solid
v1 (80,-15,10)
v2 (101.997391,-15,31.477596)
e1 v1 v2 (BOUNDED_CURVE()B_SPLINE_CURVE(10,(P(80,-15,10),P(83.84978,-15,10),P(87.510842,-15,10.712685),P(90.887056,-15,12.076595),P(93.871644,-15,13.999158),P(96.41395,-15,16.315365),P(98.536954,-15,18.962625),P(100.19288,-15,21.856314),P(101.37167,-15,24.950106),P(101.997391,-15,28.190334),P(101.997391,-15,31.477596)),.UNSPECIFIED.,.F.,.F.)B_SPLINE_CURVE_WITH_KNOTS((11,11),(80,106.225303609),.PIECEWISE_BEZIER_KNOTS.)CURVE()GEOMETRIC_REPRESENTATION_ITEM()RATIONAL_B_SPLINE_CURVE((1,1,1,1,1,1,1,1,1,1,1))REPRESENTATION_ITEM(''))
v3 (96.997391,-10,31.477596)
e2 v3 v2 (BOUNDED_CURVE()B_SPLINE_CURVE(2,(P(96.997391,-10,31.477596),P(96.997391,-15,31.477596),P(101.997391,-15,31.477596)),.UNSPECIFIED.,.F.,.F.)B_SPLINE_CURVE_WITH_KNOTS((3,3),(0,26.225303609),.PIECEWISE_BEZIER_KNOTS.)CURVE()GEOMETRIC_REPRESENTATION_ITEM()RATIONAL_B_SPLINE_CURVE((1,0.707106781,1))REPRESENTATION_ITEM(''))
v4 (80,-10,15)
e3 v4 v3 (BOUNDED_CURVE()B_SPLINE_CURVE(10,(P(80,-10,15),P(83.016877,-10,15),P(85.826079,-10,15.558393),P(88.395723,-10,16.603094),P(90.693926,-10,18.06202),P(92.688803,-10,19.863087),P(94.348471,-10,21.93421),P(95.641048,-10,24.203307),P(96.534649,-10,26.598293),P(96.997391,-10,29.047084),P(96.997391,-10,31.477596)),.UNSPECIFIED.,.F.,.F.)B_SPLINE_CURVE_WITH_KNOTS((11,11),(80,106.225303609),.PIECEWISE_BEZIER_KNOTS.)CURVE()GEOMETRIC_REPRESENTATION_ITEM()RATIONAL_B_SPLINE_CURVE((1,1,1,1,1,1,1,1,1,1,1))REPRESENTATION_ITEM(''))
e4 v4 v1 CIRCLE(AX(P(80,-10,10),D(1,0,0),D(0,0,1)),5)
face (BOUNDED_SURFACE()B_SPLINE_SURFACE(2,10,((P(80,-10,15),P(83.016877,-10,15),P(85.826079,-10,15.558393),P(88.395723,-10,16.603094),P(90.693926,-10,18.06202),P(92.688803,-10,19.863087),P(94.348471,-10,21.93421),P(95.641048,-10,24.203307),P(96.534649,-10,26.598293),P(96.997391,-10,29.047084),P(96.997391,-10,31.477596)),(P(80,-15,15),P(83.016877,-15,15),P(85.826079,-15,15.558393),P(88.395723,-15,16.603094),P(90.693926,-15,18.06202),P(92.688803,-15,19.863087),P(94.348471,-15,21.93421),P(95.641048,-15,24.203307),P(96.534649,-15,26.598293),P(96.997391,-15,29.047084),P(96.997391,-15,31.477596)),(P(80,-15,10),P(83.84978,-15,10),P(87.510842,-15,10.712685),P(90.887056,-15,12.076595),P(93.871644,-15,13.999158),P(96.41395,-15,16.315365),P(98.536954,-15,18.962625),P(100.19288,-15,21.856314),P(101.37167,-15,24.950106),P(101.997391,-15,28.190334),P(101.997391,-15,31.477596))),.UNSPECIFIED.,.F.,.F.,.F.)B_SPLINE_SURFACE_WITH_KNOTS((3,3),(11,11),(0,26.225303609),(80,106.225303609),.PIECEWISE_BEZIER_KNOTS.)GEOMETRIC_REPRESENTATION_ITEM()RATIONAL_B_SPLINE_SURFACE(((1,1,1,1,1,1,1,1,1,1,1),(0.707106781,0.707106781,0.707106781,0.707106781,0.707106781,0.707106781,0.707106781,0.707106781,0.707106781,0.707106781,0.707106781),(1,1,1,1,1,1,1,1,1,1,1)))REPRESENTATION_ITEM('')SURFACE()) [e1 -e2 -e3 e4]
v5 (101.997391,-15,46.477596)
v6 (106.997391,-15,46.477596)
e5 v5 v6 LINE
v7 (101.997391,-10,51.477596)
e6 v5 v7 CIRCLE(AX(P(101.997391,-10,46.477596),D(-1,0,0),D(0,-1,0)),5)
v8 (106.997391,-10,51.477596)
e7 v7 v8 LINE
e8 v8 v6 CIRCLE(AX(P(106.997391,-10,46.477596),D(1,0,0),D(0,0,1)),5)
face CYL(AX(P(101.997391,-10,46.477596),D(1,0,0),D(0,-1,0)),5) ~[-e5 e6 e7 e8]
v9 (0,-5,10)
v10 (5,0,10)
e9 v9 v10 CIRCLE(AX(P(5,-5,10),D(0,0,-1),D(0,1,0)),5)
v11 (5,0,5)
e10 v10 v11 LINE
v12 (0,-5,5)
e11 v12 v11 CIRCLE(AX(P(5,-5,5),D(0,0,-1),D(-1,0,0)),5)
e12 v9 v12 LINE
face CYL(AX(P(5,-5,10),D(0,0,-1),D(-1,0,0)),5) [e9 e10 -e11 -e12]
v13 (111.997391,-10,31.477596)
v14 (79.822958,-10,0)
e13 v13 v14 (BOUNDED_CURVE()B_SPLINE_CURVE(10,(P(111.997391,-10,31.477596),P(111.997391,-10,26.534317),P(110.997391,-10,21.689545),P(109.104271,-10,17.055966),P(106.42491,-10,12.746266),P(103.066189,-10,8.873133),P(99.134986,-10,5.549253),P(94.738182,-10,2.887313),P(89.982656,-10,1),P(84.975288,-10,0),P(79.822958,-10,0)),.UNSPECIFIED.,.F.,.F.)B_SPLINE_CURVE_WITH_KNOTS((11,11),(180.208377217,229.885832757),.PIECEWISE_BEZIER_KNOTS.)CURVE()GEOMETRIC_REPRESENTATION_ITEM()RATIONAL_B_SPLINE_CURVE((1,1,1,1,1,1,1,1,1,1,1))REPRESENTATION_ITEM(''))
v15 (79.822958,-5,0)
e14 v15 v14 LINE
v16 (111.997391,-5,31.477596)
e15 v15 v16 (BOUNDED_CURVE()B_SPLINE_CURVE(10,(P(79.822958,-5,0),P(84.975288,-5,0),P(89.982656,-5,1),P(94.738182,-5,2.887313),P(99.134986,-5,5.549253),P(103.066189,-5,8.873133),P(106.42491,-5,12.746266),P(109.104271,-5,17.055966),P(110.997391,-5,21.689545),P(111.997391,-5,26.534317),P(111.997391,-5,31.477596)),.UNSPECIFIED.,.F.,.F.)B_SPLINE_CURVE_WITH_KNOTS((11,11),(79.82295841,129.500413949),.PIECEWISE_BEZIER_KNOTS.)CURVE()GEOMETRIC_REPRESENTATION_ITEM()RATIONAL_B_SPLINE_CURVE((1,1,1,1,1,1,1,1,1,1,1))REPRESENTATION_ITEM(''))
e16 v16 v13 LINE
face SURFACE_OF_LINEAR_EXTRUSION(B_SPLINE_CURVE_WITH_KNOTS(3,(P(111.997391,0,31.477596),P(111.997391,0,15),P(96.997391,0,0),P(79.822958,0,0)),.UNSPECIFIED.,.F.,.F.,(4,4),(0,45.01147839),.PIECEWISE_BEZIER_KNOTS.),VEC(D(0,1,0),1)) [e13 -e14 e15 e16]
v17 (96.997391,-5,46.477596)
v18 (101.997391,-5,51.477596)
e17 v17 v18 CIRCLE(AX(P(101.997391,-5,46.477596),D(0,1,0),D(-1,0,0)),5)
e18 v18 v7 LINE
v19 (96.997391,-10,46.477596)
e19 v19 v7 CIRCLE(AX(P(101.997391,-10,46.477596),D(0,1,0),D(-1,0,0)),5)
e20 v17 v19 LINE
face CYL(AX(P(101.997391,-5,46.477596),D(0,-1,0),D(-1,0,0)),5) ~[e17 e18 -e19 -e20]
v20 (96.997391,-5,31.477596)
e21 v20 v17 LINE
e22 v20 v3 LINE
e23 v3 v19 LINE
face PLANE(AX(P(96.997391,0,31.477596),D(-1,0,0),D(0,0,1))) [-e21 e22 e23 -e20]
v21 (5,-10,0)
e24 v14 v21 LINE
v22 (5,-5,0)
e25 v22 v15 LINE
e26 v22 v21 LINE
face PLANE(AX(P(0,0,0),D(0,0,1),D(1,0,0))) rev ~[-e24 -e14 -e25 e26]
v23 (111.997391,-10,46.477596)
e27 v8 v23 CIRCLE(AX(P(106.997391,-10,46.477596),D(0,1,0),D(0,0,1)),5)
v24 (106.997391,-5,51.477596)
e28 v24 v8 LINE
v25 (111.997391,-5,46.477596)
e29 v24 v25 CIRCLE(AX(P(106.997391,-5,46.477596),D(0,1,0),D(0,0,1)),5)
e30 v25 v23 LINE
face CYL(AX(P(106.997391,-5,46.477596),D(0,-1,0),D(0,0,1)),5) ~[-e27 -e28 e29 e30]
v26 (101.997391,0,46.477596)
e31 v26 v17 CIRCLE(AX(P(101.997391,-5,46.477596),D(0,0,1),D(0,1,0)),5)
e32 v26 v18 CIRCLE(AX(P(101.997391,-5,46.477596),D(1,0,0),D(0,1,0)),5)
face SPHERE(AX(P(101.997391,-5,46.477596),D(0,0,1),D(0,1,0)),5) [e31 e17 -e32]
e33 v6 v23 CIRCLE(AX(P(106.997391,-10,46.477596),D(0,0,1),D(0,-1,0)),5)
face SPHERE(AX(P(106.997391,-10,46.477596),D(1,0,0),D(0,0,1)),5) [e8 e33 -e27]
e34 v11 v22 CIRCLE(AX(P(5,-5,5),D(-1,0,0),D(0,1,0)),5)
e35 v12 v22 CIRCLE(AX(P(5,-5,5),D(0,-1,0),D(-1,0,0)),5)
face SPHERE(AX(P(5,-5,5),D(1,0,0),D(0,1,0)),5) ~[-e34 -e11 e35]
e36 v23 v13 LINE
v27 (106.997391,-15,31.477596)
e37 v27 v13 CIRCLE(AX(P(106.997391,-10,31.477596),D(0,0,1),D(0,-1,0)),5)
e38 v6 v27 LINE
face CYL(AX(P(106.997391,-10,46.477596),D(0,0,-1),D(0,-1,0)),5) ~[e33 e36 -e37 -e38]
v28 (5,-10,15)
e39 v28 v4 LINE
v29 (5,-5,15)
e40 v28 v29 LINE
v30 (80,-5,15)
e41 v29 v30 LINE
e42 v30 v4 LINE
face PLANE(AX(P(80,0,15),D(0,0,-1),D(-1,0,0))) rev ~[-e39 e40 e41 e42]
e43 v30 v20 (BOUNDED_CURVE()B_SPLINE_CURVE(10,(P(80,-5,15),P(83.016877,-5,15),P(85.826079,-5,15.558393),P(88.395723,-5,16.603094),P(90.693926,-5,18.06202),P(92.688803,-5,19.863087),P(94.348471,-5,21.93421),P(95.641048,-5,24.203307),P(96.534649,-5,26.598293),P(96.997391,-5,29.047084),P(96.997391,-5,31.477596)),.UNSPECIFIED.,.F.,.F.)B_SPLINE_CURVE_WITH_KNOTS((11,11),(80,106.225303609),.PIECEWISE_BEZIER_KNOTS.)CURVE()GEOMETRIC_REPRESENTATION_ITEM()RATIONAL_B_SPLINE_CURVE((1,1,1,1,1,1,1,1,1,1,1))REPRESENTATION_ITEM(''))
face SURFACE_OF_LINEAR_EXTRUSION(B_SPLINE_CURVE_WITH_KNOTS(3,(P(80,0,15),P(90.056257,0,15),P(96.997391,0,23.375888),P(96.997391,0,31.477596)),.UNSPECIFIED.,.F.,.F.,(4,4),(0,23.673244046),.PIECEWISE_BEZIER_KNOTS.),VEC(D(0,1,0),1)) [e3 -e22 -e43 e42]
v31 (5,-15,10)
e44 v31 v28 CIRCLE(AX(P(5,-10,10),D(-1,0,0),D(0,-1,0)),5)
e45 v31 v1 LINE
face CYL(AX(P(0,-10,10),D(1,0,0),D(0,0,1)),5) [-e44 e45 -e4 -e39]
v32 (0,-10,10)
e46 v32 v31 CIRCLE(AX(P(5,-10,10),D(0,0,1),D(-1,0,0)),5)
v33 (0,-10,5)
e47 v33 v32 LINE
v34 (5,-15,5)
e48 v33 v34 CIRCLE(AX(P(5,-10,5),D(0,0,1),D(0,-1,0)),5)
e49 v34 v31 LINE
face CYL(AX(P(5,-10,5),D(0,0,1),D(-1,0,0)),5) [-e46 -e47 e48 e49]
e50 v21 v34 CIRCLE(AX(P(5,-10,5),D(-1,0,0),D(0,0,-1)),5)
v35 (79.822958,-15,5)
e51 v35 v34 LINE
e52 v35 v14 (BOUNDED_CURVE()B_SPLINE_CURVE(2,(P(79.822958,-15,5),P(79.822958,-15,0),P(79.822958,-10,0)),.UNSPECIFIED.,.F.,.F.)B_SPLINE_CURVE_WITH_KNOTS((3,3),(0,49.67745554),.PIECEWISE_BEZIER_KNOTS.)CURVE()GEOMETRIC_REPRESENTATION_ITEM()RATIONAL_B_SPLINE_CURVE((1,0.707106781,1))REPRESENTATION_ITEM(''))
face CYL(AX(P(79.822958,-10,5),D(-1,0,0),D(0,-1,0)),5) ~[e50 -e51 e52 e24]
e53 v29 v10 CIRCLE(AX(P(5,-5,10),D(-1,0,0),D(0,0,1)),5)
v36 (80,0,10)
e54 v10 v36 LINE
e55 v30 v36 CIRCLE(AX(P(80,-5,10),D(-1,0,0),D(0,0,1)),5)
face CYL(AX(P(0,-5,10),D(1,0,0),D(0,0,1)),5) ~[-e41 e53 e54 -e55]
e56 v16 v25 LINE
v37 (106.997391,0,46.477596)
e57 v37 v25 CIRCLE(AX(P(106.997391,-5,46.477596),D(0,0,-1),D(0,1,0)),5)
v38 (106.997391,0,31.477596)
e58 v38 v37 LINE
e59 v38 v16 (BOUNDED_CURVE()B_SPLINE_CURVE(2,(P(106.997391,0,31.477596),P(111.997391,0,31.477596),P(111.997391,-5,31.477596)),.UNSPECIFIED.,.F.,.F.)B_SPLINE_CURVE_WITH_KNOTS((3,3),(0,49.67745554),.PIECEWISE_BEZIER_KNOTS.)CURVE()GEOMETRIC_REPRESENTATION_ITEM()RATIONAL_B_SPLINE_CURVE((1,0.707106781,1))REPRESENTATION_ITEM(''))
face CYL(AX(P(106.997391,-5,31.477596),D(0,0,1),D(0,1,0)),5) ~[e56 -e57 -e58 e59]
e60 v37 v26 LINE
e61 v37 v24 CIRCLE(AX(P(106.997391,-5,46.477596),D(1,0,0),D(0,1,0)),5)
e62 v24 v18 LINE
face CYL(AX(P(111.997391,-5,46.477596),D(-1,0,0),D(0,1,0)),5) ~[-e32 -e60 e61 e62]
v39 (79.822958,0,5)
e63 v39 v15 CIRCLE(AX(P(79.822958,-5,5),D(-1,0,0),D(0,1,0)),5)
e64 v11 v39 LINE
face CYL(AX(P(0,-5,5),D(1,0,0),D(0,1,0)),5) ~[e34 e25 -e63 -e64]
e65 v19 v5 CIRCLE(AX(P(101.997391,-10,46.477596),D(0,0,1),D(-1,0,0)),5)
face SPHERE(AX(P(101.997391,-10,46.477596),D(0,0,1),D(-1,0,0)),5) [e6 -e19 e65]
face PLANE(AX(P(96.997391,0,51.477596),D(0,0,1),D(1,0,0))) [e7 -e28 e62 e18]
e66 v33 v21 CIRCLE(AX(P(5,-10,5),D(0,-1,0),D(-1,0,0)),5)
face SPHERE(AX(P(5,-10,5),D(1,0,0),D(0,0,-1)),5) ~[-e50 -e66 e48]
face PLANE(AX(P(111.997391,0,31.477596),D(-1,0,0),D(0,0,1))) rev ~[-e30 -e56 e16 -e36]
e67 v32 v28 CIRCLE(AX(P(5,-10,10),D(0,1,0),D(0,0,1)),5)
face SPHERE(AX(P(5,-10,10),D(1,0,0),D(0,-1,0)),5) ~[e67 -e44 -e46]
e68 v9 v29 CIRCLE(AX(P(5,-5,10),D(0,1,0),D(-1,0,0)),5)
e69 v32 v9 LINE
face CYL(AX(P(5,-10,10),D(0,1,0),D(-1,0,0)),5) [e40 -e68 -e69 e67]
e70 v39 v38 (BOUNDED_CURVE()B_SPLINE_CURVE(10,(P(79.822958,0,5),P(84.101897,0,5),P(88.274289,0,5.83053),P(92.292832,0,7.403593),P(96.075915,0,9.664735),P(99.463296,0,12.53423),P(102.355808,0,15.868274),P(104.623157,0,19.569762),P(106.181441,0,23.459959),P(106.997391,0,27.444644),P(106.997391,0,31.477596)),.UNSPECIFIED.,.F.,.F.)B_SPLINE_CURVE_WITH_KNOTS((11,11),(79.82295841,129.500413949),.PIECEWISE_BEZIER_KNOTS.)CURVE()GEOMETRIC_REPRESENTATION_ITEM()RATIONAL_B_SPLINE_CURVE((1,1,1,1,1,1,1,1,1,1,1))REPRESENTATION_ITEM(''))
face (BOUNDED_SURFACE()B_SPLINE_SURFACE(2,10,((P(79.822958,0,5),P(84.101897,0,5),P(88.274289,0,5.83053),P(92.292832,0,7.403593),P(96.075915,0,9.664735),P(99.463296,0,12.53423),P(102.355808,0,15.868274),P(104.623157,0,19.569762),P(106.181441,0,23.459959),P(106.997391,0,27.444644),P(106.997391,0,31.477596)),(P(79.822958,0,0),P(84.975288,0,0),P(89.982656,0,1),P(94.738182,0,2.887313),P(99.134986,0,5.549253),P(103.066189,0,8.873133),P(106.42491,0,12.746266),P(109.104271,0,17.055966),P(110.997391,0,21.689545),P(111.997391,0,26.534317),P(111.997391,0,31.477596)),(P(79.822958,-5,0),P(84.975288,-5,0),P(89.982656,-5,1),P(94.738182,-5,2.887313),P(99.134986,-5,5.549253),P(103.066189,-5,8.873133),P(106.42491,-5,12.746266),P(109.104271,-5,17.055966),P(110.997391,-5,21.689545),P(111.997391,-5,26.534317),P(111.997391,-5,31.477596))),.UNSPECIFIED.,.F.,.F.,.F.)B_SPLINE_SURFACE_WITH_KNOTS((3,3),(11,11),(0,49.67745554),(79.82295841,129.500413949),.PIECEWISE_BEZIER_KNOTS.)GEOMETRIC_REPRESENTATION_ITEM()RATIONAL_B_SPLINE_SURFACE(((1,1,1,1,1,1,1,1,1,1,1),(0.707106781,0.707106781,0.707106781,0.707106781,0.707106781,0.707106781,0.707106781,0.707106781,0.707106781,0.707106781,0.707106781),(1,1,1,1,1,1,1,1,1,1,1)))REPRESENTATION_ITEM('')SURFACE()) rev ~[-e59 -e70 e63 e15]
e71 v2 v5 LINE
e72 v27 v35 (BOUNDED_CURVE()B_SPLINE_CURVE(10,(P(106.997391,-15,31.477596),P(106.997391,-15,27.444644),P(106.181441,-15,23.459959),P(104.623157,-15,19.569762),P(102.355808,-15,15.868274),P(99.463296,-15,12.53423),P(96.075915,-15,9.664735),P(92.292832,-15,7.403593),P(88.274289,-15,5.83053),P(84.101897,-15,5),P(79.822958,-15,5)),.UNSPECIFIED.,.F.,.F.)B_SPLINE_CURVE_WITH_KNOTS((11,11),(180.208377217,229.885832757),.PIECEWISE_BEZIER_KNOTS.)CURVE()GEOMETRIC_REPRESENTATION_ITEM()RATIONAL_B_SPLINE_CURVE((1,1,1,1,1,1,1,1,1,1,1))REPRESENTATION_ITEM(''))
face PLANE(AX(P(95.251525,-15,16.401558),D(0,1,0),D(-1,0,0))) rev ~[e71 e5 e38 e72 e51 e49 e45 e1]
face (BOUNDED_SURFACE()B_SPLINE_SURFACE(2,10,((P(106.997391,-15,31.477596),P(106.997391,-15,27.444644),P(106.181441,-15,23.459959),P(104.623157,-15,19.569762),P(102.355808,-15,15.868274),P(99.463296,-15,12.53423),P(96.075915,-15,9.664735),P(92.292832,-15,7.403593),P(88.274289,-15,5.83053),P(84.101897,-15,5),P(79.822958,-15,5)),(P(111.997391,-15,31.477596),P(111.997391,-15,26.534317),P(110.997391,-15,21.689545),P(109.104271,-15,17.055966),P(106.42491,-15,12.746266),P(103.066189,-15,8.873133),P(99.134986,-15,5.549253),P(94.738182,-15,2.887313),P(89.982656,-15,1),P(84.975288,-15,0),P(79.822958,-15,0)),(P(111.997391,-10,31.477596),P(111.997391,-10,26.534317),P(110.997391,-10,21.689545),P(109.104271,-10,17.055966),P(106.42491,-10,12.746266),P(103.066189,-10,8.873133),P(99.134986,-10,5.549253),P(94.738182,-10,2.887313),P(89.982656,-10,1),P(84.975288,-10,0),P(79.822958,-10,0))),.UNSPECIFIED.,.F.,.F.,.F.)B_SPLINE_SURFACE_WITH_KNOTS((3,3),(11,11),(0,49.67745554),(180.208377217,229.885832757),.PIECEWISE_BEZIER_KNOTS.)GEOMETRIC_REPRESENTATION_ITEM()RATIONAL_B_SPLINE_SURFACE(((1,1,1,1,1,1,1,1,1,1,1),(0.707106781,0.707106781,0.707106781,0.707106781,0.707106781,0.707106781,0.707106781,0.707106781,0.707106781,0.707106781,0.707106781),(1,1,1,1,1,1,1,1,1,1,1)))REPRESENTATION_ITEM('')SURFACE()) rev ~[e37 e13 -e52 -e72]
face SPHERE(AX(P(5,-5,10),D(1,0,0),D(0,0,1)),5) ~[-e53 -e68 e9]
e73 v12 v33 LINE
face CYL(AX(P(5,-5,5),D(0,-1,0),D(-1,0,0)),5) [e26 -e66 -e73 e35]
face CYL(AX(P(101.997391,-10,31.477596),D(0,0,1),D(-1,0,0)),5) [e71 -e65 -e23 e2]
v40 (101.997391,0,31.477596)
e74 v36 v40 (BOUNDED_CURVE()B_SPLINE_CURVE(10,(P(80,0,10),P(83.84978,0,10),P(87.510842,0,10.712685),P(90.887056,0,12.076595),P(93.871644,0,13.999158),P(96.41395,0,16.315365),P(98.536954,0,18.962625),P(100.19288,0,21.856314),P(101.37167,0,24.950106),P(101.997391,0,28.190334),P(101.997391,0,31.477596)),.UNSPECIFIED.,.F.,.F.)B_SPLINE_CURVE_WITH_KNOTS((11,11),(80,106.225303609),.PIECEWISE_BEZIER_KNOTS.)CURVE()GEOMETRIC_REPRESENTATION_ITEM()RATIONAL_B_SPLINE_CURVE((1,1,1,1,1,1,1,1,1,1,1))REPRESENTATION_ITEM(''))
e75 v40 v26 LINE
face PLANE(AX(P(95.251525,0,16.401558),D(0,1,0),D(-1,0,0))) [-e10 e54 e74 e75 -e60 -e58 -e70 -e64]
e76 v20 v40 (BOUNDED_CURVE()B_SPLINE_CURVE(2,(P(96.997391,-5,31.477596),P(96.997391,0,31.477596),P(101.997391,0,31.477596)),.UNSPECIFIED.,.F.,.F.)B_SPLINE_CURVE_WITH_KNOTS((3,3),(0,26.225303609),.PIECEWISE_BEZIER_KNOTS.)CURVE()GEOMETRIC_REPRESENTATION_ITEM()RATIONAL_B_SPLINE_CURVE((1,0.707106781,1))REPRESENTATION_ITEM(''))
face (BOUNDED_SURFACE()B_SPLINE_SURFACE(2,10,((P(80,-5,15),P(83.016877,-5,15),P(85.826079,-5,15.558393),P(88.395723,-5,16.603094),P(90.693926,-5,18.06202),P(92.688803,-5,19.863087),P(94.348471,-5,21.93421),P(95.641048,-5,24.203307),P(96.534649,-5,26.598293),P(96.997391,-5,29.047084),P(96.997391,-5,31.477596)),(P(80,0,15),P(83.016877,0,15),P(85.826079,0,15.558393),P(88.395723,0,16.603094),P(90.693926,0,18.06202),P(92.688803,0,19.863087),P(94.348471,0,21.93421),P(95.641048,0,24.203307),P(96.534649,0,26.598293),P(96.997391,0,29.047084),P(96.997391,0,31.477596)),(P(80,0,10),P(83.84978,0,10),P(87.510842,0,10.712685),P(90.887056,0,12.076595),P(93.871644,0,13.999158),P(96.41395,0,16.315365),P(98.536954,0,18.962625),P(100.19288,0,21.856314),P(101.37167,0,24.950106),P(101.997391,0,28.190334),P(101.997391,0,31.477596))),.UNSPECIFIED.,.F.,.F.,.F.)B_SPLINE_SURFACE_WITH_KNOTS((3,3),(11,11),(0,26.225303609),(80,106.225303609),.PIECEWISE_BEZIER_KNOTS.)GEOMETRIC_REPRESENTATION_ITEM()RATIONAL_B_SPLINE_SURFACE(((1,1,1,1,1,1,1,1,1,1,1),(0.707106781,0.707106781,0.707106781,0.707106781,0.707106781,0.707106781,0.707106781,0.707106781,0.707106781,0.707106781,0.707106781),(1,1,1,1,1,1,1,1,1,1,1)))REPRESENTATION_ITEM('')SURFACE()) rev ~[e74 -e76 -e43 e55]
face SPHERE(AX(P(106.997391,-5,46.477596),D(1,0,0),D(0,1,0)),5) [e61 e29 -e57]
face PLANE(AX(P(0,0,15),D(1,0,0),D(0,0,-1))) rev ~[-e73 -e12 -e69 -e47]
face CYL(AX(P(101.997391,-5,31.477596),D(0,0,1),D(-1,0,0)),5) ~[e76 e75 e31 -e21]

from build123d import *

# Parameters (mm, degrees)
F0_W     = 15
F0_H     = 20
F1_DEPTH = 15
F2_F1_R  = 5
F2_F2_R  = 5
F2_F3_R  = 5
F2_F4_R  = 5
F2_F5_R  = 5


# Not quite as in the source:
# - a feature of the source that left no trace in its solid (it failed there, or was rolled back) is left out
# - a feature names something its author has since deleted; it is built from what else it names


with BuildPart() as f1:
    # F0 (on Front) → F1 (new body)
    with BuildSketch(Plane.XZ):
        with BuildLine():
            add(Edge.make_bspline(
                [(80, 15), (90.0562568152, 15), (96.9973913685, 23.3758884073), (96.9973913685, 31.4775960116)],
                knots=[0, 0, 0, 0, 23.6732440459, 23.6732440459, 23.6732440459, 23.6732440459], degree=3))
            Line((80, 15), (79.8229584098, 0))
            add(Edge.make_bspline(
                [(111.9973913685, 31.4775960116), (111.9973913685, 15), (96.9973913685, 0), (79.8229584098, 0)],
                knots=[0, 0, 0, 0, 45.0114783904, 45.0114783904, 45.0114783904, 45.0114783904], degree=3))
            Line((111.9973913685, 31.4775960116), (96.9973913685, 31.4775960116))
        make_face()
        with Locations((104.4973913685, 41.4775960116)):
            Rectangle(F0_W, F0_H)
        Polygon((80, 15), (0, 15), (0, 0), (79.8229584098, 0), align=None)
    extrude(amount=F1_DEPTH)

    # F2: fillet of radius 5 on 20 edges, made by hand

    # F2_f1
    f2_f1_edges = [f1.edges().sort_by_distance(p)[0] for p in [
        (92.2697919899, 0, 20.2006576542),
        (96.9973913685, 0, 41.4775960116),
        (40, 0, 15),
    ]]
    fillet(f2_f1_edges, radius=F2_F1_R)

    # F2_f2
    f2_f2_edges = [f1.edges().sort_by_distance(p)[0] for p in [
        (92.2697919899, -15, 20.2006576542),
        (96.9973913685, -15, 41.4775960116),
        (40, -15, 15),
    ]]
    fillet(f2_f2_edges, radius=F2_F2_R)

    # F2_f3
    f2_f3_edges = [f1.edges().sort_by_distance(p)[0] for p in [
        (96.9973913685, -7.5, 51.4775960116),
    ]]
    fillet(f2_f3_edges, radius=F2_F3_R)

    # F2_f4
    f2_f4_edges = [f1.edges().sort_by_distance(p)[0] for p in [
        (111.9973913685, -7.5, 51.4775960116),
    ]]
    fillet(f2_f4_edges, radius=F2_F4_R)

    # F2_f5
    f2_f5_edges = [f1.edges().sort_by_distance(p)[0] for p in [
        (0, -7.5, 0),
    ]]
    fillet(f2_f5_edges, radius=F2_F5_R)


solid = f1.part
